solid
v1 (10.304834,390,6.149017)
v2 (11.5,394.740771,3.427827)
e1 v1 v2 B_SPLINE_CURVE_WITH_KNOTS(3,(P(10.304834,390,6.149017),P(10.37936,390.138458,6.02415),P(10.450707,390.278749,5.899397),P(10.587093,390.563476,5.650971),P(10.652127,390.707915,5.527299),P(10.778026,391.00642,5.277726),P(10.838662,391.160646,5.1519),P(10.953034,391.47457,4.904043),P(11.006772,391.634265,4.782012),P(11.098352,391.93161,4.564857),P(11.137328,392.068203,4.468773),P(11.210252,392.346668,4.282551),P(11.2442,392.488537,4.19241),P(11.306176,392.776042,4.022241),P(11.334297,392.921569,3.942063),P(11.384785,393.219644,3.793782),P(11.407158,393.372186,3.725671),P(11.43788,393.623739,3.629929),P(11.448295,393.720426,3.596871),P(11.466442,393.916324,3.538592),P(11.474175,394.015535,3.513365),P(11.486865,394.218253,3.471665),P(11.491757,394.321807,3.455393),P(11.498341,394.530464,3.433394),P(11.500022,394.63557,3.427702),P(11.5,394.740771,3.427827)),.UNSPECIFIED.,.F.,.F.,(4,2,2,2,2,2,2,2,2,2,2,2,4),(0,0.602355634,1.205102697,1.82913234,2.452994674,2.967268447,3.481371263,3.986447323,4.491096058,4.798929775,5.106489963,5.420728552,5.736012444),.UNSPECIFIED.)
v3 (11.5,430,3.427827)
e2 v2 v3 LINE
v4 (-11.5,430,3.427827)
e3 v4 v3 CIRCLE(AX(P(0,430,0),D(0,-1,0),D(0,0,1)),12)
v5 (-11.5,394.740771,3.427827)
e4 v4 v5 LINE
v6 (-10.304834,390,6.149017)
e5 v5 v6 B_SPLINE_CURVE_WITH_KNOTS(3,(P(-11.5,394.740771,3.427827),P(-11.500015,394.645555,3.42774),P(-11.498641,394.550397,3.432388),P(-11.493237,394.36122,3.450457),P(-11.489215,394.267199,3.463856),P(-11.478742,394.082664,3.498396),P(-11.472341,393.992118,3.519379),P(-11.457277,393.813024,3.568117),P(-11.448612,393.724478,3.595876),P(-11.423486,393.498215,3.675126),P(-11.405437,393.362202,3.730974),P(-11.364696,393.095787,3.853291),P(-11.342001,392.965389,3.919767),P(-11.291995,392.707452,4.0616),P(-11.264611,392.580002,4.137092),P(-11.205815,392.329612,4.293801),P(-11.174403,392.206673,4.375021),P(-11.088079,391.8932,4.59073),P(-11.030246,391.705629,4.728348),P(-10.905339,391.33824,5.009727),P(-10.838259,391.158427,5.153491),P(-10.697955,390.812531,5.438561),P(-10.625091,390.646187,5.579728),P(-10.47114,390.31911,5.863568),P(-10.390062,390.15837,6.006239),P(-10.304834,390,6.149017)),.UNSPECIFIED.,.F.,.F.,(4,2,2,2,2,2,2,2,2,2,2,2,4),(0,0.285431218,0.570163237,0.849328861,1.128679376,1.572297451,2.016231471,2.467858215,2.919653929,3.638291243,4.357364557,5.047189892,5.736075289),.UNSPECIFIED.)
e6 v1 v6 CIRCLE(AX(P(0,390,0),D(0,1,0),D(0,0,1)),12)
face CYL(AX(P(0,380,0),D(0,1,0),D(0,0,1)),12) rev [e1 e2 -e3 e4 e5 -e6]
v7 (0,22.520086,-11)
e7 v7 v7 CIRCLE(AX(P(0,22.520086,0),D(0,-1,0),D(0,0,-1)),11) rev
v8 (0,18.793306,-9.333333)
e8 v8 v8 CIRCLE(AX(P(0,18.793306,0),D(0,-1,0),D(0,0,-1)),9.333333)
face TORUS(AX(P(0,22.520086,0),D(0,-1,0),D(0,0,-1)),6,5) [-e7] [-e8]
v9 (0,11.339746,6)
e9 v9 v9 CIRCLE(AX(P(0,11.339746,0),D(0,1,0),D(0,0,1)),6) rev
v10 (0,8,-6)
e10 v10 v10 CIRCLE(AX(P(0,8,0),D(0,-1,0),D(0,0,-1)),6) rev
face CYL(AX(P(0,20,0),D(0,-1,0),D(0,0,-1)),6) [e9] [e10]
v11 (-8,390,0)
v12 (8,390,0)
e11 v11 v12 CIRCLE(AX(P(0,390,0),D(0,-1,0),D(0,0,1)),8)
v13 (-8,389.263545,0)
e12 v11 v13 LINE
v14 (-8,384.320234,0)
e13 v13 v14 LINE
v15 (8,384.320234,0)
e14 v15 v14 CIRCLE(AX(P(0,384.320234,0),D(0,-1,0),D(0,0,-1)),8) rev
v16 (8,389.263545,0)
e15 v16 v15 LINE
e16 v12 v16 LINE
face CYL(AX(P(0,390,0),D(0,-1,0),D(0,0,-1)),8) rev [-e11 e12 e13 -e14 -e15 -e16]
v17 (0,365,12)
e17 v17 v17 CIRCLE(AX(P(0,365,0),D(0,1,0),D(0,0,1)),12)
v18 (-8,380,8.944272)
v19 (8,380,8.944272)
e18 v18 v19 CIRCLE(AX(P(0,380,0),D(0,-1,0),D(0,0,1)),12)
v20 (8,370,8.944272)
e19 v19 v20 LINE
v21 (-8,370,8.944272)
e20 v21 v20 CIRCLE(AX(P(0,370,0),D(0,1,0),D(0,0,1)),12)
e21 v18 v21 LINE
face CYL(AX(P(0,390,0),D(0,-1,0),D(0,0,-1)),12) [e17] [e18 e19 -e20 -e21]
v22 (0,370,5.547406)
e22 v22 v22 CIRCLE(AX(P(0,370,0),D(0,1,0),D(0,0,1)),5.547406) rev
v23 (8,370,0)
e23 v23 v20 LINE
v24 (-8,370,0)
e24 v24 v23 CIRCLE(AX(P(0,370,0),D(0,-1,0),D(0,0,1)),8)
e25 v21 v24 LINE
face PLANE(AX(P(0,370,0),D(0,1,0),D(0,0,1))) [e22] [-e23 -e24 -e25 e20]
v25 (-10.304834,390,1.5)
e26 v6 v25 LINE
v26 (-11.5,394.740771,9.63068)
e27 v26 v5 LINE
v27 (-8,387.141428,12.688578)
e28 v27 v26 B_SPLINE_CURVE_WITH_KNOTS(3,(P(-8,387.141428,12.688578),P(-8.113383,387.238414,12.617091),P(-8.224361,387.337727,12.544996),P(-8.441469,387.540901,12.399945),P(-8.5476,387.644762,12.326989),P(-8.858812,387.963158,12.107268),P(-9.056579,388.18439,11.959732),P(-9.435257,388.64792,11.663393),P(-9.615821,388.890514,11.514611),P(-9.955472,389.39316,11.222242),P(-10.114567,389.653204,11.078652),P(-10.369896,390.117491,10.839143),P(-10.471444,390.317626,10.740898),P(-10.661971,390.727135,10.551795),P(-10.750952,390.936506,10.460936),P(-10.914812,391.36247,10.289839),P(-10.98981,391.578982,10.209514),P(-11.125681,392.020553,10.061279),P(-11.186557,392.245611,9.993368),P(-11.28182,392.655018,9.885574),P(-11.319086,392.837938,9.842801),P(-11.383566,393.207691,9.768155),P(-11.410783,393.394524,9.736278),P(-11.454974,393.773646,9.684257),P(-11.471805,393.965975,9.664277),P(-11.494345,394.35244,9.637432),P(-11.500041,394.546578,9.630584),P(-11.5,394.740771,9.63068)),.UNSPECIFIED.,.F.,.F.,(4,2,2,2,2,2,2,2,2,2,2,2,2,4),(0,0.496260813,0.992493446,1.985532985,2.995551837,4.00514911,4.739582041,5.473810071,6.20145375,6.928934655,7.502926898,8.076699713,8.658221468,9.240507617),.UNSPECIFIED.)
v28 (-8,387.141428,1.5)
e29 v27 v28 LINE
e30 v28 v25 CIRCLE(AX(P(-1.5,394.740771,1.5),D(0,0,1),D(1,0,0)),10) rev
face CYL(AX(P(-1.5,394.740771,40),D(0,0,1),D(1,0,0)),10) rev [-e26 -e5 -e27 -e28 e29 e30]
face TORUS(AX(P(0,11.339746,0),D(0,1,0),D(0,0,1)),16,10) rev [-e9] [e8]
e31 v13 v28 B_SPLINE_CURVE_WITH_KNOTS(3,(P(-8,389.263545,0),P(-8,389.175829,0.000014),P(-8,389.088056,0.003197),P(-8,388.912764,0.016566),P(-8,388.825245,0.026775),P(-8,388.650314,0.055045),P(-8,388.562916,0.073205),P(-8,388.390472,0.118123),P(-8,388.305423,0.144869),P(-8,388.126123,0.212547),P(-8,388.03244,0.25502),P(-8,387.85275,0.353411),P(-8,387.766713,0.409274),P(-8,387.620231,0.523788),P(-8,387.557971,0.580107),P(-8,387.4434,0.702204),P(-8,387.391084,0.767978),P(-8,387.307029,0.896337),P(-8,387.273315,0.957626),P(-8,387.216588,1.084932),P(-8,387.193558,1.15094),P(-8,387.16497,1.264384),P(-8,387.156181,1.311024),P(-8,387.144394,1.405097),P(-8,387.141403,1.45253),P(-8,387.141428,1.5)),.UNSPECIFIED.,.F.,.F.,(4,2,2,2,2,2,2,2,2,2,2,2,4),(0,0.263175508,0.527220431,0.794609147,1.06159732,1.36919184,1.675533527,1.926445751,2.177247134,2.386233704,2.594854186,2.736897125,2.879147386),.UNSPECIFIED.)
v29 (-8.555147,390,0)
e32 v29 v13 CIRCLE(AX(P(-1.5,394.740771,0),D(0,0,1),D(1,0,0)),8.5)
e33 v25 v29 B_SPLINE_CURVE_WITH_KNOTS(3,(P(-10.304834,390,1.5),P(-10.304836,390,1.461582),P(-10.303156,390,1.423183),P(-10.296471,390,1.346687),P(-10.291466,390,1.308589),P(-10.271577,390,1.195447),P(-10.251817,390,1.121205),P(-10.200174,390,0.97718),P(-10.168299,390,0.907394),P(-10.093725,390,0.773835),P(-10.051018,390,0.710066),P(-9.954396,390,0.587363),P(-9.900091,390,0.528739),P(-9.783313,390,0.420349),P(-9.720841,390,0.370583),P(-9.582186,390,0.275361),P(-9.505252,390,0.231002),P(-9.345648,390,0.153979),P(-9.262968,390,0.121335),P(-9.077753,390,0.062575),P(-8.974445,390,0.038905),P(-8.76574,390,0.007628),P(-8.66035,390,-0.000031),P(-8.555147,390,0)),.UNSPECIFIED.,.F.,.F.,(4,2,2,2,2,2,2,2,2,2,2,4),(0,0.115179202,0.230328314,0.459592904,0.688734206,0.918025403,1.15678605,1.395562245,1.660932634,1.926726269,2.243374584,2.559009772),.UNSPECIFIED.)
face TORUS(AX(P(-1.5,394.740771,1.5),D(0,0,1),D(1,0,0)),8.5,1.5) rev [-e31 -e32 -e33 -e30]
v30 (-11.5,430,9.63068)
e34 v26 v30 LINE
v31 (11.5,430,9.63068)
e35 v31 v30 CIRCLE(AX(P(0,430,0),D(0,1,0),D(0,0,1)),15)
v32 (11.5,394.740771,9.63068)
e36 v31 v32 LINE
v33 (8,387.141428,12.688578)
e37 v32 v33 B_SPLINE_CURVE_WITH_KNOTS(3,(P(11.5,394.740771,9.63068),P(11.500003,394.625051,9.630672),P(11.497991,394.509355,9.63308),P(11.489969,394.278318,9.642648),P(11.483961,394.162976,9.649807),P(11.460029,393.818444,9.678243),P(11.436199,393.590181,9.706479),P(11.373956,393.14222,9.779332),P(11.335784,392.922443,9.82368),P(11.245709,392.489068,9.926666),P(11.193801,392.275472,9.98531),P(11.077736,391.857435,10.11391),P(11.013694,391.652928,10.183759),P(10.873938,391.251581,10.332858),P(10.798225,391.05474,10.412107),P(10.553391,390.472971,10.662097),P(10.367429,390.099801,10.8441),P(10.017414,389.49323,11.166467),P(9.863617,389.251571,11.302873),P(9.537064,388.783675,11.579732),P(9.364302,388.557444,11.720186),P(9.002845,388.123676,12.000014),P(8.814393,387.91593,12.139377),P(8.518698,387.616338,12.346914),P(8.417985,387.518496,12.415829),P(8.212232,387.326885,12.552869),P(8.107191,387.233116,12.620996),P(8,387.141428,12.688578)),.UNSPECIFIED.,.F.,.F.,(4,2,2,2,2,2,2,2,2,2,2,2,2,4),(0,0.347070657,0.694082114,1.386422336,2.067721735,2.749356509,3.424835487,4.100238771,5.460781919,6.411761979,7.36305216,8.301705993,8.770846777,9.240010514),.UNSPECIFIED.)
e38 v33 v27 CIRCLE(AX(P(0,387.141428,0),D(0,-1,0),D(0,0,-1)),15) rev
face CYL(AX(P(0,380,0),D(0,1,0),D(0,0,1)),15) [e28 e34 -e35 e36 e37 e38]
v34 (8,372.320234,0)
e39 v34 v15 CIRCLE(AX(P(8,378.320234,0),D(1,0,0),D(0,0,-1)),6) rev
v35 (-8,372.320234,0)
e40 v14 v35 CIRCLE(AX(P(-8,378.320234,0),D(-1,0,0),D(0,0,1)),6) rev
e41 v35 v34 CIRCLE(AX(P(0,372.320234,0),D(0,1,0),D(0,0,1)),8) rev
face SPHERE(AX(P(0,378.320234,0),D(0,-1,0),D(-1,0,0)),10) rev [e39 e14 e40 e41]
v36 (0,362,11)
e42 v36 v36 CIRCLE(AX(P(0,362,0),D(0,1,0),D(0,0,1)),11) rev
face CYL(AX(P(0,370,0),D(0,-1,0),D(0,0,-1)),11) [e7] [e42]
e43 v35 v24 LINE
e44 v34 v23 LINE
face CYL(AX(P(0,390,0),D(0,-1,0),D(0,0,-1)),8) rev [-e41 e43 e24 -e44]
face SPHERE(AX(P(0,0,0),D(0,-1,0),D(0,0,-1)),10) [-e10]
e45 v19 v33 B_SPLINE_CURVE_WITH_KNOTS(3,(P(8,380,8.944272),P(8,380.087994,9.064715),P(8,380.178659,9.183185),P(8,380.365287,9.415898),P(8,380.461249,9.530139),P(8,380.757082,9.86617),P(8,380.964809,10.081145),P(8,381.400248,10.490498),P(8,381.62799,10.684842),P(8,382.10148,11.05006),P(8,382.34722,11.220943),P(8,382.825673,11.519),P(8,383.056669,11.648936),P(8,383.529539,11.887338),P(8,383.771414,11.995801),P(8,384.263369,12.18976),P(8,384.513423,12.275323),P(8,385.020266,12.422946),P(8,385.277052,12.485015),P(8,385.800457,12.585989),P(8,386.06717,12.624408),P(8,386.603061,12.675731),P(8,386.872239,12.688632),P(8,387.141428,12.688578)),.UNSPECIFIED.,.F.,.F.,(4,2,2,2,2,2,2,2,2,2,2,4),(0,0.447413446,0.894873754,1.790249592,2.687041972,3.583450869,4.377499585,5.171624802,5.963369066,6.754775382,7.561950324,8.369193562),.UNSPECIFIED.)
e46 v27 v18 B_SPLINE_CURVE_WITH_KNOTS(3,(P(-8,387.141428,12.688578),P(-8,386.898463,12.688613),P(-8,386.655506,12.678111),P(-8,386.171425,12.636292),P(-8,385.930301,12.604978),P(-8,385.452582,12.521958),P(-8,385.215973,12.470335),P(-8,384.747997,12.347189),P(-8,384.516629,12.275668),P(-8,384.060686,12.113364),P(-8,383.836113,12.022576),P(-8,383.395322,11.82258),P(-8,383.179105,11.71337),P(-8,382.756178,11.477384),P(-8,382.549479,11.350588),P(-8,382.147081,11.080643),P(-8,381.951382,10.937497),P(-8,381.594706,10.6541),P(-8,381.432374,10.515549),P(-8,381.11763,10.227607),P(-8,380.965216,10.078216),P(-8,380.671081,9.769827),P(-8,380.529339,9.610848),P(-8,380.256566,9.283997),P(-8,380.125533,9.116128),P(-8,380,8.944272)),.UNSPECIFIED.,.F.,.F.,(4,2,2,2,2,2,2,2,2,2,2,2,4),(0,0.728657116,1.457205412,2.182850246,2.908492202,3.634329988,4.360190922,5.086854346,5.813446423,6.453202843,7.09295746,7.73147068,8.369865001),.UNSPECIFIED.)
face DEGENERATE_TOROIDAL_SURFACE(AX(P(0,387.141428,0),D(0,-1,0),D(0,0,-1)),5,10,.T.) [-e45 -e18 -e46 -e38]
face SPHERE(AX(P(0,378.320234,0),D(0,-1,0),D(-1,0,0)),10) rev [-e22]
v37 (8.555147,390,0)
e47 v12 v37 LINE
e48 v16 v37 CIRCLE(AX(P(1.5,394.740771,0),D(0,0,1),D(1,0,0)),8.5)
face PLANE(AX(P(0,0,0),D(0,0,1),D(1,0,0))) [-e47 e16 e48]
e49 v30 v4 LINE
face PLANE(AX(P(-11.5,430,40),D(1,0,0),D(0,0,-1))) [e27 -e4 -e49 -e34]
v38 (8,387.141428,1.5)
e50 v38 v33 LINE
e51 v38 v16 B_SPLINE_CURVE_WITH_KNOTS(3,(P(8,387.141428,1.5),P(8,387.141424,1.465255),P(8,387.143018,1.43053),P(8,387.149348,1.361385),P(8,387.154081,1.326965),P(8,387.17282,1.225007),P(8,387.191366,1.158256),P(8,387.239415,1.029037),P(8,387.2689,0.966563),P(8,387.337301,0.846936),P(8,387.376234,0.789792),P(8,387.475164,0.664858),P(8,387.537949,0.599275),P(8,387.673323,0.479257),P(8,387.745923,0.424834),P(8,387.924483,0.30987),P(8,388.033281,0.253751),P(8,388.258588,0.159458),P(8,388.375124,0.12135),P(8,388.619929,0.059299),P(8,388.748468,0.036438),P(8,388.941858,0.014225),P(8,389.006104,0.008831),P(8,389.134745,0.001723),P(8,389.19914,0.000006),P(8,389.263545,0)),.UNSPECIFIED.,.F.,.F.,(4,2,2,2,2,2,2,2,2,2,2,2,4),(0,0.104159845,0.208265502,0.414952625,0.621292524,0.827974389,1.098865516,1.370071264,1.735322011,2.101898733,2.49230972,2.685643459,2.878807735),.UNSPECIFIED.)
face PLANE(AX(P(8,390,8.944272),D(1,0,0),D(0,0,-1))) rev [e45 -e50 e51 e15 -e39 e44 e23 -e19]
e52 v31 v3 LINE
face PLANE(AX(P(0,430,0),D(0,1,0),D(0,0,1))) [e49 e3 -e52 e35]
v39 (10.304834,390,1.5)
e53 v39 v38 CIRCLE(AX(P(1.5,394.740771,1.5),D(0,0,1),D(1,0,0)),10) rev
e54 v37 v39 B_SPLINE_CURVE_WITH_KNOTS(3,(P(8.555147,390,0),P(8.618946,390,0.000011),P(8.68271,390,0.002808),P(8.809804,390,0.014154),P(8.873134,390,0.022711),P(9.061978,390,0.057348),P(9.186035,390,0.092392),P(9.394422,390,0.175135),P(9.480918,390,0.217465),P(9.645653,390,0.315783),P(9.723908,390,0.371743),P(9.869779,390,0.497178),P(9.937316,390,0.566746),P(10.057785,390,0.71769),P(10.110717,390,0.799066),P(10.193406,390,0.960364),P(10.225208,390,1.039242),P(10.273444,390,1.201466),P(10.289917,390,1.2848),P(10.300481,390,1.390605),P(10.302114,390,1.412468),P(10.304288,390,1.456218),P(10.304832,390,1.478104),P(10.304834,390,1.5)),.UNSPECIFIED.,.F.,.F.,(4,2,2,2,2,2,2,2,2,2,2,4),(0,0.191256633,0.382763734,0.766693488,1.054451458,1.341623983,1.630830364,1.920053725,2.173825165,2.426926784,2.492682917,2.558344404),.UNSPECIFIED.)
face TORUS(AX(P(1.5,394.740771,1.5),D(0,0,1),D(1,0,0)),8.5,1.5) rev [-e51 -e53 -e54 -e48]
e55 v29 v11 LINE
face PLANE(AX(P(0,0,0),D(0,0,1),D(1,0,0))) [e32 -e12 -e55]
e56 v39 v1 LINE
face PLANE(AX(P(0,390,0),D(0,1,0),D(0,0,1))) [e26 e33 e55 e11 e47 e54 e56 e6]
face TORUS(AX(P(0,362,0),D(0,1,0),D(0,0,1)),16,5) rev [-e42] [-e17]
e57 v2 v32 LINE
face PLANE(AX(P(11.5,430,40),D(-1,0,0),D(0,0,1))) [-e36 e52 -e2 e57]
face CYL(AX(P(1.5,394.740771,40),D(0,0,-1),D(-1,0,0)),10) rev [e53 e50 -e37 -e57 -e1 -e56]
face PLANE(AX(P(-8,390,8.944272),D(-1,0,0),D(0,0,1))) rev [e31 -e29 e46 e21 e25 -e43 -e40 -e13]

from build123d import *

# Parameters (mm, degrees)
ESBO_O2_R                     = 6
RESSALTO_EXTRUS_O1_DEPTH      = 20
ESBO_O3_R                     = 11
RESSALTO_EXTRUS_O2_DEPTH      = 350
FILETE1_R                     = 10
FILETE2_R                     = 5
RESSALTO_EXTRUS_O3_DEPTH      = 20
RESSALTO_EXTRUS_O4_START      = -5
ESBO_O7_R                     = 12
RESSALTO_EXTRUS_O4_DEPTH      = 5
FILETE3_R                     = 5
RESSALTO_EXTRUS_O5_DEPTH      = 40
RESSALTO_EXTRUS_O5_DEPTH_BACK = 10
FILETE4_R                     = 10
ESBO_O11_W                    = 23
ESBO_O11_H                    = 42.858571571
CORTE_EXTRUS_O3_DEPTH         = 40
FILETE5_R                     = 10
FILETE6_R                     = 1.5


with BuildPart() as part:
    # Esboço1 → Revolução1 (revolve)
    with BuildSketch(Plane.XY):
        with BuildLine():
            Line((-10, 0), (10, 0))
            ThreePointArc((10, 0), (0, 10), (-10, 0))
        make_face()
    revolve(axis=Axis((-10, 0, 0), (1, 0, 0)))

    # Esboço2 → Ressalto-extrusão1 (add)
    with BuildSketch(Plane(origin=(0, 0, 0), x_dir=(1, 0, 0), z_dir=(0, 1, 0))):
        with Locations(Location((0, 0, 0), (0, 0, 90))):
            Circle(ESBO_O2_R)
    extrude(amount=RESSALTO_EXTRUS_O1_DEPTH)

    # Esboço3 → Ressalto-extrusão2 (add)
    with BuildSketch(Plane(origin=(0, 20, 0), x_dir=(1, 0, 0), z_dir=(0, 1, 0))):
        with Locations(Location((0, 0, 0), (0, 0, 270))):
            Circle(ESBO_O3_R)
    extrude(amount=RESSALTO_EXTRUS_O2_DEPTH)

    # Filete1
    # the kernel refuses this fillet: 10 mm, written as the material it adds along each edge
    with BuildSketch(Plane(origin=(0, 20, 0), x_dir=(0, 0, -1), z_dir=(1, 0, 0))) as filete1_piece_1:
        with BuildLine():
            CenterArc((16, -8.660254038), FILETE1_R, 120, 60)
            Line((6, -8.660254038), (5.8, -8.660254038))
            Line((5.8, -8.660254038), (5.8, 0))
            Line((5.8, 0), (6, 0.2))
            ThreePointArc((6, 0.2), (8.5, 0.2), (10.9, 0.173205081))
            Line((10.9, 0.173205081), (11, 0))
        make_face()
    revolve(axis=Axis((0, 20, 0), (0, 1, 0)))

    # Filete2
    filete2_edges = [part.edges().sort_by_distance(p)[0] for p in [
        (11, 20, 0),
    ]]
    fillet(filete2_edges, radius=FILETE2_R)

    # Esboço5 → Ressalto-extrusão3 (add)
    with BuildSketch(Plane(origin=(0, 370, 0), x_dir=(1, 0, 0), z_dir=(0, 1, 0))):
        with BuildLine():
            Line((-8, -8.94427191), (-8, 0))
            ThreePointArc((-8, 0), (0, 8), (8, 0))
            Line((8, 0), (8, -8.94427191))
            ThreePointArc((8, -8.94427191), (12, 0), (8, 8.94427191))
            ThreePointArc((8, 8.94427191), (0, 12), (-8, 8.94427191))
            ThreePointArc((-8, 8.94427191), (-12, 0), (-8, -8.94427191))
        make_face()
    extrude(amount=RESSALTO_EXTRUS_O3_DEPTH)

    # Esboço7 → Ressalto-extrusão4 (add)
    with BuildSketch(Plane(origin=(0, 370, 0), x_dir=(1, 0, 0), z_dir=(0, 1, 0)).offset(RESSALTO_EXTRUS_O4_START)):
        with Locations(Location((0, 0, 0), (0, 0, 311.810314896))):
            Circle(ESBO_O7_R)
    extrude(amount=RESSALTO_EXTRUS_O4_DEPTH)

    # Filete3
    # the kernel refuses this fillet: 5 mm, written as the material it adds along each edge
    with BuildSketch(Plane(origin=(0, 365, 0), x_dir=(0, 0, 1), z_dir=(1, 0, 0))) as filete3_piece_1:
        with BuildLine():
            CenterArc((16, 3), FILETE3_R, 180, 36.869897646)
            Line((12, 0), (11.92, -0.06))
            ThreePointArc((11.92, -0.06), (11.5, -0.1), (11, -0.1))
            Line((11, -0.1), (10.9, 0))
            Line((10.9, 0), (10.9, 3))
            Line((10.9, 3), (11, 3))
        make_face()
    revolve(axis=Axis((0, 365, 0), (0, -1, 0)))

    # Esboço8 → Corte-Revolução1 (revolve, cut)
    with BuildSketch(Plane.XY):
        with BuildLine():
            Line((0, 368.32023385), (0, 388.32023385))
            ThreePointArc((0, 388.32023385), (-10, 378.32023385), (0, 368.32023385))
        make_face()
    revolve(axis=Axis((0, 368.32023385, 0), (0, 1, 0)), mode=Mode.SUBTRACT)

    # Esboço10 → Ressalto-extrusão5 (add, two sides: drawn at the far end of the back side and taken through both)
    with BuildSketch(Plane(origin=(0, 390, 0), x_dir=(1, 0, 0), z_dir=(0, 1, 0)).offset(-RESSALTO_EXTRUS_O5_DEPTH_BACK)):
        with BuildLine():
            Line((-8, -8.94427191), (-8, -12.68857754))
            ThreePointArc((-8, -12.68857754), (0, 15), (8, -12.68857754))
            Line((8, -12.68857754), (8, -8.94427191))
            ThreePointArc((8, -8.94427191), (0, 12), (-8, -8.94427191))
        make_face()
    extrude(amount=RESSALTO_EXTRUS_O5_DEPTH + RESSALTO_EXTRUS_O5_DEPTH_BACK)

    # Filete4
    # the kernel refuses this fillet: 10 mm, written as the material it takes off along each edge
    with BuildSketch(Plane(origin=(0, 380, 0), x_dir=(-0.003141587485879309, 0, 0.9999950652018582), z_dir=(0.9999950652018582, 0, 0.003141587485879309))) as filete4_piece_1:
        with BuildLine():
            CenterArc((5, -7.141428429), FILETE4_R, 0, 45.572995999)
            Line((15, -7.141428429), (15, 0))
            Line((15, 0), (12, 0))
        make_face()
    revolve(axis=Axis((0, 380, 0), (0, -1, 0)), revolution_arc=359.64, mode=Mode.SUBTRACT)

    # Esboço11 → Corte-extrusão3 (cut)
    with BuildSketch(Plane.XY):
        with Locations((0, 408.570714215)):
            Rectangle(ESBO_O11_W, ESBO_O11_H)
    extrude(amount=CORTE_EXTRUS_O3_DEPTH, mode=Mode.SUBTRACT)

    # Filete5
    # the kernel refuses this fillet: 10 mm, written as the material it adds along each edge
    with BuildSketch(Plane(origin=(11.5, 387.141428429, -18.998355192), x_dir=(-1, 0, 0), z_dir=(0, 0, 1))) as filete5_piece_1_section:
        with BuildLine():
            CenterArc((10, -7.599342077), FILETE5_R, 130.541601874, 49.458398126)
            Line((0, -7.599342077), (0, 0))
            Line((0, 0), (3.5, 0))
        make_face()
    filete5_piece_1 = extrude(amount=47.627390526, mode=Mode.PRIVATE)
    filete5_piece_1 = filete5_piece_1 & Plane(origin=(0, 388.451461542, 0), x_dir=(-0.5333333333333332, 0, 0.8459051693633014), z_dir=(0, -1, 0)) * Cylinder(15, 126, mode=Mode.PRIVATE)
    filete5_piece_1 = split(filete5_piece_1, bisect_by=Plane(origin=(9.300320043, 390, 4.472135955), z_dir=(0, -1, 0)), keep=Keep.TOP, mode=Mode.PRIVATE)
    add(filete5_piece_1)
    with BuildSketch(Plane(origin=(11.5, 387.141428429, -18.998355192), x_dir=(-1, 0, 0), z_dir=(0, 0, 1))) as filete5_piece_2_section:
        with BuildLine():
            CenterArc((10, -7.599342077), FILETE5_R, 130.541601874, 49.458398126)
            Line((0, -7.599342077), (0, 0))
            Line((0, 0), (3.5, 0))
        make_face()
    filete5_piece_2 = extrude(amount=47.627390526, mode=Mode.PRIVATE)
    filete5_piece_2 = filete5_piece_2 & Plane(origin=(0, 392.291329927, 0), x_dir=(-0.5333333333333332, 0, 0.8459051693633014), z_dir=(0, -1, 0)) * Cylinder(15, 126, mode=Mode.PRIVATE)
    filete5_piece_2 = filete5_piece_2 - Plane(origin=(0, 392.291329927, 0), x_dir=(0.666666666666667, 0, 0.7453559924999297), z_dir=(0, -1, 0)) * Cylinder(12, 126, mode=Mode.PRIVATE)
    add(filete5_piece_2)
    with BuildSketch(Plane(origin=(-11.5, 387.141428429, -18.998355192), x_dir=(1, 0, 0), z_dir=(0, 0, 1))) as filete5_piece_3_section:
        with BuildLine():
            CenterArc((10, 7.599342077), FILETE5_R, 180, 49.458398126)
            Line((0, 7.599342077), (0, 0))
            Line((0, 0), (3.5, 0))
        make_face()
    filete5_piece_3 = extrude(amount=47.627390526, mode=Mode.PRIVATE)
    filete5_piece_3 = filete5_piece_3 & Plane(origin=(0, 388.451461532, 0), x_dir=(-0.5333333333333332, 0, 0.8459051693633014), z_dir=(0, -1, 0)) * Cylinder(15, 126, mode=Mode.PRIVATE)
    filete5_piece_3 = split(filete5_piece_3, bisect_by=Plane(origin=(-9.300320034, 390, 4.472135955), z_dir=(0, -1, 0)), keep=Keep.TOP, mode=Mode.PRIVATE)
    add(filete5_piece_3)
    with BuildSketch(Plane(origin=(-11.5, 387.141428429, -18.998355192), x_dir=(1, 0, 0), z_dir=(0, 0, 1))) as filete5_piece_4_section:
        with BuildLine():
            CenterArc((10, 7.599342077), FILETE5_R, 180, 49.458398126)
            Line((0, 7.599342077), (0, 0))
            Line((0, 0), (3.5, 0))
        make_face()
    filete5_piece_4 = extrude(amount=47.627390526, mode=Mode.PRIVATE)
    filete5_piece_4 = filete5_piece_4 & Plane(origin=(0, 392.291329925, 0), x_dir=(-0.5333333333333332, 0, 0.8459051693633014), z_dir=(0, -1, 0)) * Cylinder(15, 126, mode=Mode.PRIVATE)
    filete5_piece_4 = filete5_piece_4 - Plane(origin=(0, 392.291329925, 0), x_dir=(0.666666666666667, 0, 0.7453559924999297), z_dir=(0, -1, 0)) * Cylinder(12, 126, mode=Mode.PRIVATE)
    add(filete5_piece_4)

    # Filete6
    filete6_edges = [part.edges().sort_by_distance(p)[0] for p in [
        (9.284750533, 388.464015043, 0),
        (-9.284750533, 388.464015043, 0),
    ]]
    fillet(filete6_edges, radius=FILETE6_R)


solid = part.part
